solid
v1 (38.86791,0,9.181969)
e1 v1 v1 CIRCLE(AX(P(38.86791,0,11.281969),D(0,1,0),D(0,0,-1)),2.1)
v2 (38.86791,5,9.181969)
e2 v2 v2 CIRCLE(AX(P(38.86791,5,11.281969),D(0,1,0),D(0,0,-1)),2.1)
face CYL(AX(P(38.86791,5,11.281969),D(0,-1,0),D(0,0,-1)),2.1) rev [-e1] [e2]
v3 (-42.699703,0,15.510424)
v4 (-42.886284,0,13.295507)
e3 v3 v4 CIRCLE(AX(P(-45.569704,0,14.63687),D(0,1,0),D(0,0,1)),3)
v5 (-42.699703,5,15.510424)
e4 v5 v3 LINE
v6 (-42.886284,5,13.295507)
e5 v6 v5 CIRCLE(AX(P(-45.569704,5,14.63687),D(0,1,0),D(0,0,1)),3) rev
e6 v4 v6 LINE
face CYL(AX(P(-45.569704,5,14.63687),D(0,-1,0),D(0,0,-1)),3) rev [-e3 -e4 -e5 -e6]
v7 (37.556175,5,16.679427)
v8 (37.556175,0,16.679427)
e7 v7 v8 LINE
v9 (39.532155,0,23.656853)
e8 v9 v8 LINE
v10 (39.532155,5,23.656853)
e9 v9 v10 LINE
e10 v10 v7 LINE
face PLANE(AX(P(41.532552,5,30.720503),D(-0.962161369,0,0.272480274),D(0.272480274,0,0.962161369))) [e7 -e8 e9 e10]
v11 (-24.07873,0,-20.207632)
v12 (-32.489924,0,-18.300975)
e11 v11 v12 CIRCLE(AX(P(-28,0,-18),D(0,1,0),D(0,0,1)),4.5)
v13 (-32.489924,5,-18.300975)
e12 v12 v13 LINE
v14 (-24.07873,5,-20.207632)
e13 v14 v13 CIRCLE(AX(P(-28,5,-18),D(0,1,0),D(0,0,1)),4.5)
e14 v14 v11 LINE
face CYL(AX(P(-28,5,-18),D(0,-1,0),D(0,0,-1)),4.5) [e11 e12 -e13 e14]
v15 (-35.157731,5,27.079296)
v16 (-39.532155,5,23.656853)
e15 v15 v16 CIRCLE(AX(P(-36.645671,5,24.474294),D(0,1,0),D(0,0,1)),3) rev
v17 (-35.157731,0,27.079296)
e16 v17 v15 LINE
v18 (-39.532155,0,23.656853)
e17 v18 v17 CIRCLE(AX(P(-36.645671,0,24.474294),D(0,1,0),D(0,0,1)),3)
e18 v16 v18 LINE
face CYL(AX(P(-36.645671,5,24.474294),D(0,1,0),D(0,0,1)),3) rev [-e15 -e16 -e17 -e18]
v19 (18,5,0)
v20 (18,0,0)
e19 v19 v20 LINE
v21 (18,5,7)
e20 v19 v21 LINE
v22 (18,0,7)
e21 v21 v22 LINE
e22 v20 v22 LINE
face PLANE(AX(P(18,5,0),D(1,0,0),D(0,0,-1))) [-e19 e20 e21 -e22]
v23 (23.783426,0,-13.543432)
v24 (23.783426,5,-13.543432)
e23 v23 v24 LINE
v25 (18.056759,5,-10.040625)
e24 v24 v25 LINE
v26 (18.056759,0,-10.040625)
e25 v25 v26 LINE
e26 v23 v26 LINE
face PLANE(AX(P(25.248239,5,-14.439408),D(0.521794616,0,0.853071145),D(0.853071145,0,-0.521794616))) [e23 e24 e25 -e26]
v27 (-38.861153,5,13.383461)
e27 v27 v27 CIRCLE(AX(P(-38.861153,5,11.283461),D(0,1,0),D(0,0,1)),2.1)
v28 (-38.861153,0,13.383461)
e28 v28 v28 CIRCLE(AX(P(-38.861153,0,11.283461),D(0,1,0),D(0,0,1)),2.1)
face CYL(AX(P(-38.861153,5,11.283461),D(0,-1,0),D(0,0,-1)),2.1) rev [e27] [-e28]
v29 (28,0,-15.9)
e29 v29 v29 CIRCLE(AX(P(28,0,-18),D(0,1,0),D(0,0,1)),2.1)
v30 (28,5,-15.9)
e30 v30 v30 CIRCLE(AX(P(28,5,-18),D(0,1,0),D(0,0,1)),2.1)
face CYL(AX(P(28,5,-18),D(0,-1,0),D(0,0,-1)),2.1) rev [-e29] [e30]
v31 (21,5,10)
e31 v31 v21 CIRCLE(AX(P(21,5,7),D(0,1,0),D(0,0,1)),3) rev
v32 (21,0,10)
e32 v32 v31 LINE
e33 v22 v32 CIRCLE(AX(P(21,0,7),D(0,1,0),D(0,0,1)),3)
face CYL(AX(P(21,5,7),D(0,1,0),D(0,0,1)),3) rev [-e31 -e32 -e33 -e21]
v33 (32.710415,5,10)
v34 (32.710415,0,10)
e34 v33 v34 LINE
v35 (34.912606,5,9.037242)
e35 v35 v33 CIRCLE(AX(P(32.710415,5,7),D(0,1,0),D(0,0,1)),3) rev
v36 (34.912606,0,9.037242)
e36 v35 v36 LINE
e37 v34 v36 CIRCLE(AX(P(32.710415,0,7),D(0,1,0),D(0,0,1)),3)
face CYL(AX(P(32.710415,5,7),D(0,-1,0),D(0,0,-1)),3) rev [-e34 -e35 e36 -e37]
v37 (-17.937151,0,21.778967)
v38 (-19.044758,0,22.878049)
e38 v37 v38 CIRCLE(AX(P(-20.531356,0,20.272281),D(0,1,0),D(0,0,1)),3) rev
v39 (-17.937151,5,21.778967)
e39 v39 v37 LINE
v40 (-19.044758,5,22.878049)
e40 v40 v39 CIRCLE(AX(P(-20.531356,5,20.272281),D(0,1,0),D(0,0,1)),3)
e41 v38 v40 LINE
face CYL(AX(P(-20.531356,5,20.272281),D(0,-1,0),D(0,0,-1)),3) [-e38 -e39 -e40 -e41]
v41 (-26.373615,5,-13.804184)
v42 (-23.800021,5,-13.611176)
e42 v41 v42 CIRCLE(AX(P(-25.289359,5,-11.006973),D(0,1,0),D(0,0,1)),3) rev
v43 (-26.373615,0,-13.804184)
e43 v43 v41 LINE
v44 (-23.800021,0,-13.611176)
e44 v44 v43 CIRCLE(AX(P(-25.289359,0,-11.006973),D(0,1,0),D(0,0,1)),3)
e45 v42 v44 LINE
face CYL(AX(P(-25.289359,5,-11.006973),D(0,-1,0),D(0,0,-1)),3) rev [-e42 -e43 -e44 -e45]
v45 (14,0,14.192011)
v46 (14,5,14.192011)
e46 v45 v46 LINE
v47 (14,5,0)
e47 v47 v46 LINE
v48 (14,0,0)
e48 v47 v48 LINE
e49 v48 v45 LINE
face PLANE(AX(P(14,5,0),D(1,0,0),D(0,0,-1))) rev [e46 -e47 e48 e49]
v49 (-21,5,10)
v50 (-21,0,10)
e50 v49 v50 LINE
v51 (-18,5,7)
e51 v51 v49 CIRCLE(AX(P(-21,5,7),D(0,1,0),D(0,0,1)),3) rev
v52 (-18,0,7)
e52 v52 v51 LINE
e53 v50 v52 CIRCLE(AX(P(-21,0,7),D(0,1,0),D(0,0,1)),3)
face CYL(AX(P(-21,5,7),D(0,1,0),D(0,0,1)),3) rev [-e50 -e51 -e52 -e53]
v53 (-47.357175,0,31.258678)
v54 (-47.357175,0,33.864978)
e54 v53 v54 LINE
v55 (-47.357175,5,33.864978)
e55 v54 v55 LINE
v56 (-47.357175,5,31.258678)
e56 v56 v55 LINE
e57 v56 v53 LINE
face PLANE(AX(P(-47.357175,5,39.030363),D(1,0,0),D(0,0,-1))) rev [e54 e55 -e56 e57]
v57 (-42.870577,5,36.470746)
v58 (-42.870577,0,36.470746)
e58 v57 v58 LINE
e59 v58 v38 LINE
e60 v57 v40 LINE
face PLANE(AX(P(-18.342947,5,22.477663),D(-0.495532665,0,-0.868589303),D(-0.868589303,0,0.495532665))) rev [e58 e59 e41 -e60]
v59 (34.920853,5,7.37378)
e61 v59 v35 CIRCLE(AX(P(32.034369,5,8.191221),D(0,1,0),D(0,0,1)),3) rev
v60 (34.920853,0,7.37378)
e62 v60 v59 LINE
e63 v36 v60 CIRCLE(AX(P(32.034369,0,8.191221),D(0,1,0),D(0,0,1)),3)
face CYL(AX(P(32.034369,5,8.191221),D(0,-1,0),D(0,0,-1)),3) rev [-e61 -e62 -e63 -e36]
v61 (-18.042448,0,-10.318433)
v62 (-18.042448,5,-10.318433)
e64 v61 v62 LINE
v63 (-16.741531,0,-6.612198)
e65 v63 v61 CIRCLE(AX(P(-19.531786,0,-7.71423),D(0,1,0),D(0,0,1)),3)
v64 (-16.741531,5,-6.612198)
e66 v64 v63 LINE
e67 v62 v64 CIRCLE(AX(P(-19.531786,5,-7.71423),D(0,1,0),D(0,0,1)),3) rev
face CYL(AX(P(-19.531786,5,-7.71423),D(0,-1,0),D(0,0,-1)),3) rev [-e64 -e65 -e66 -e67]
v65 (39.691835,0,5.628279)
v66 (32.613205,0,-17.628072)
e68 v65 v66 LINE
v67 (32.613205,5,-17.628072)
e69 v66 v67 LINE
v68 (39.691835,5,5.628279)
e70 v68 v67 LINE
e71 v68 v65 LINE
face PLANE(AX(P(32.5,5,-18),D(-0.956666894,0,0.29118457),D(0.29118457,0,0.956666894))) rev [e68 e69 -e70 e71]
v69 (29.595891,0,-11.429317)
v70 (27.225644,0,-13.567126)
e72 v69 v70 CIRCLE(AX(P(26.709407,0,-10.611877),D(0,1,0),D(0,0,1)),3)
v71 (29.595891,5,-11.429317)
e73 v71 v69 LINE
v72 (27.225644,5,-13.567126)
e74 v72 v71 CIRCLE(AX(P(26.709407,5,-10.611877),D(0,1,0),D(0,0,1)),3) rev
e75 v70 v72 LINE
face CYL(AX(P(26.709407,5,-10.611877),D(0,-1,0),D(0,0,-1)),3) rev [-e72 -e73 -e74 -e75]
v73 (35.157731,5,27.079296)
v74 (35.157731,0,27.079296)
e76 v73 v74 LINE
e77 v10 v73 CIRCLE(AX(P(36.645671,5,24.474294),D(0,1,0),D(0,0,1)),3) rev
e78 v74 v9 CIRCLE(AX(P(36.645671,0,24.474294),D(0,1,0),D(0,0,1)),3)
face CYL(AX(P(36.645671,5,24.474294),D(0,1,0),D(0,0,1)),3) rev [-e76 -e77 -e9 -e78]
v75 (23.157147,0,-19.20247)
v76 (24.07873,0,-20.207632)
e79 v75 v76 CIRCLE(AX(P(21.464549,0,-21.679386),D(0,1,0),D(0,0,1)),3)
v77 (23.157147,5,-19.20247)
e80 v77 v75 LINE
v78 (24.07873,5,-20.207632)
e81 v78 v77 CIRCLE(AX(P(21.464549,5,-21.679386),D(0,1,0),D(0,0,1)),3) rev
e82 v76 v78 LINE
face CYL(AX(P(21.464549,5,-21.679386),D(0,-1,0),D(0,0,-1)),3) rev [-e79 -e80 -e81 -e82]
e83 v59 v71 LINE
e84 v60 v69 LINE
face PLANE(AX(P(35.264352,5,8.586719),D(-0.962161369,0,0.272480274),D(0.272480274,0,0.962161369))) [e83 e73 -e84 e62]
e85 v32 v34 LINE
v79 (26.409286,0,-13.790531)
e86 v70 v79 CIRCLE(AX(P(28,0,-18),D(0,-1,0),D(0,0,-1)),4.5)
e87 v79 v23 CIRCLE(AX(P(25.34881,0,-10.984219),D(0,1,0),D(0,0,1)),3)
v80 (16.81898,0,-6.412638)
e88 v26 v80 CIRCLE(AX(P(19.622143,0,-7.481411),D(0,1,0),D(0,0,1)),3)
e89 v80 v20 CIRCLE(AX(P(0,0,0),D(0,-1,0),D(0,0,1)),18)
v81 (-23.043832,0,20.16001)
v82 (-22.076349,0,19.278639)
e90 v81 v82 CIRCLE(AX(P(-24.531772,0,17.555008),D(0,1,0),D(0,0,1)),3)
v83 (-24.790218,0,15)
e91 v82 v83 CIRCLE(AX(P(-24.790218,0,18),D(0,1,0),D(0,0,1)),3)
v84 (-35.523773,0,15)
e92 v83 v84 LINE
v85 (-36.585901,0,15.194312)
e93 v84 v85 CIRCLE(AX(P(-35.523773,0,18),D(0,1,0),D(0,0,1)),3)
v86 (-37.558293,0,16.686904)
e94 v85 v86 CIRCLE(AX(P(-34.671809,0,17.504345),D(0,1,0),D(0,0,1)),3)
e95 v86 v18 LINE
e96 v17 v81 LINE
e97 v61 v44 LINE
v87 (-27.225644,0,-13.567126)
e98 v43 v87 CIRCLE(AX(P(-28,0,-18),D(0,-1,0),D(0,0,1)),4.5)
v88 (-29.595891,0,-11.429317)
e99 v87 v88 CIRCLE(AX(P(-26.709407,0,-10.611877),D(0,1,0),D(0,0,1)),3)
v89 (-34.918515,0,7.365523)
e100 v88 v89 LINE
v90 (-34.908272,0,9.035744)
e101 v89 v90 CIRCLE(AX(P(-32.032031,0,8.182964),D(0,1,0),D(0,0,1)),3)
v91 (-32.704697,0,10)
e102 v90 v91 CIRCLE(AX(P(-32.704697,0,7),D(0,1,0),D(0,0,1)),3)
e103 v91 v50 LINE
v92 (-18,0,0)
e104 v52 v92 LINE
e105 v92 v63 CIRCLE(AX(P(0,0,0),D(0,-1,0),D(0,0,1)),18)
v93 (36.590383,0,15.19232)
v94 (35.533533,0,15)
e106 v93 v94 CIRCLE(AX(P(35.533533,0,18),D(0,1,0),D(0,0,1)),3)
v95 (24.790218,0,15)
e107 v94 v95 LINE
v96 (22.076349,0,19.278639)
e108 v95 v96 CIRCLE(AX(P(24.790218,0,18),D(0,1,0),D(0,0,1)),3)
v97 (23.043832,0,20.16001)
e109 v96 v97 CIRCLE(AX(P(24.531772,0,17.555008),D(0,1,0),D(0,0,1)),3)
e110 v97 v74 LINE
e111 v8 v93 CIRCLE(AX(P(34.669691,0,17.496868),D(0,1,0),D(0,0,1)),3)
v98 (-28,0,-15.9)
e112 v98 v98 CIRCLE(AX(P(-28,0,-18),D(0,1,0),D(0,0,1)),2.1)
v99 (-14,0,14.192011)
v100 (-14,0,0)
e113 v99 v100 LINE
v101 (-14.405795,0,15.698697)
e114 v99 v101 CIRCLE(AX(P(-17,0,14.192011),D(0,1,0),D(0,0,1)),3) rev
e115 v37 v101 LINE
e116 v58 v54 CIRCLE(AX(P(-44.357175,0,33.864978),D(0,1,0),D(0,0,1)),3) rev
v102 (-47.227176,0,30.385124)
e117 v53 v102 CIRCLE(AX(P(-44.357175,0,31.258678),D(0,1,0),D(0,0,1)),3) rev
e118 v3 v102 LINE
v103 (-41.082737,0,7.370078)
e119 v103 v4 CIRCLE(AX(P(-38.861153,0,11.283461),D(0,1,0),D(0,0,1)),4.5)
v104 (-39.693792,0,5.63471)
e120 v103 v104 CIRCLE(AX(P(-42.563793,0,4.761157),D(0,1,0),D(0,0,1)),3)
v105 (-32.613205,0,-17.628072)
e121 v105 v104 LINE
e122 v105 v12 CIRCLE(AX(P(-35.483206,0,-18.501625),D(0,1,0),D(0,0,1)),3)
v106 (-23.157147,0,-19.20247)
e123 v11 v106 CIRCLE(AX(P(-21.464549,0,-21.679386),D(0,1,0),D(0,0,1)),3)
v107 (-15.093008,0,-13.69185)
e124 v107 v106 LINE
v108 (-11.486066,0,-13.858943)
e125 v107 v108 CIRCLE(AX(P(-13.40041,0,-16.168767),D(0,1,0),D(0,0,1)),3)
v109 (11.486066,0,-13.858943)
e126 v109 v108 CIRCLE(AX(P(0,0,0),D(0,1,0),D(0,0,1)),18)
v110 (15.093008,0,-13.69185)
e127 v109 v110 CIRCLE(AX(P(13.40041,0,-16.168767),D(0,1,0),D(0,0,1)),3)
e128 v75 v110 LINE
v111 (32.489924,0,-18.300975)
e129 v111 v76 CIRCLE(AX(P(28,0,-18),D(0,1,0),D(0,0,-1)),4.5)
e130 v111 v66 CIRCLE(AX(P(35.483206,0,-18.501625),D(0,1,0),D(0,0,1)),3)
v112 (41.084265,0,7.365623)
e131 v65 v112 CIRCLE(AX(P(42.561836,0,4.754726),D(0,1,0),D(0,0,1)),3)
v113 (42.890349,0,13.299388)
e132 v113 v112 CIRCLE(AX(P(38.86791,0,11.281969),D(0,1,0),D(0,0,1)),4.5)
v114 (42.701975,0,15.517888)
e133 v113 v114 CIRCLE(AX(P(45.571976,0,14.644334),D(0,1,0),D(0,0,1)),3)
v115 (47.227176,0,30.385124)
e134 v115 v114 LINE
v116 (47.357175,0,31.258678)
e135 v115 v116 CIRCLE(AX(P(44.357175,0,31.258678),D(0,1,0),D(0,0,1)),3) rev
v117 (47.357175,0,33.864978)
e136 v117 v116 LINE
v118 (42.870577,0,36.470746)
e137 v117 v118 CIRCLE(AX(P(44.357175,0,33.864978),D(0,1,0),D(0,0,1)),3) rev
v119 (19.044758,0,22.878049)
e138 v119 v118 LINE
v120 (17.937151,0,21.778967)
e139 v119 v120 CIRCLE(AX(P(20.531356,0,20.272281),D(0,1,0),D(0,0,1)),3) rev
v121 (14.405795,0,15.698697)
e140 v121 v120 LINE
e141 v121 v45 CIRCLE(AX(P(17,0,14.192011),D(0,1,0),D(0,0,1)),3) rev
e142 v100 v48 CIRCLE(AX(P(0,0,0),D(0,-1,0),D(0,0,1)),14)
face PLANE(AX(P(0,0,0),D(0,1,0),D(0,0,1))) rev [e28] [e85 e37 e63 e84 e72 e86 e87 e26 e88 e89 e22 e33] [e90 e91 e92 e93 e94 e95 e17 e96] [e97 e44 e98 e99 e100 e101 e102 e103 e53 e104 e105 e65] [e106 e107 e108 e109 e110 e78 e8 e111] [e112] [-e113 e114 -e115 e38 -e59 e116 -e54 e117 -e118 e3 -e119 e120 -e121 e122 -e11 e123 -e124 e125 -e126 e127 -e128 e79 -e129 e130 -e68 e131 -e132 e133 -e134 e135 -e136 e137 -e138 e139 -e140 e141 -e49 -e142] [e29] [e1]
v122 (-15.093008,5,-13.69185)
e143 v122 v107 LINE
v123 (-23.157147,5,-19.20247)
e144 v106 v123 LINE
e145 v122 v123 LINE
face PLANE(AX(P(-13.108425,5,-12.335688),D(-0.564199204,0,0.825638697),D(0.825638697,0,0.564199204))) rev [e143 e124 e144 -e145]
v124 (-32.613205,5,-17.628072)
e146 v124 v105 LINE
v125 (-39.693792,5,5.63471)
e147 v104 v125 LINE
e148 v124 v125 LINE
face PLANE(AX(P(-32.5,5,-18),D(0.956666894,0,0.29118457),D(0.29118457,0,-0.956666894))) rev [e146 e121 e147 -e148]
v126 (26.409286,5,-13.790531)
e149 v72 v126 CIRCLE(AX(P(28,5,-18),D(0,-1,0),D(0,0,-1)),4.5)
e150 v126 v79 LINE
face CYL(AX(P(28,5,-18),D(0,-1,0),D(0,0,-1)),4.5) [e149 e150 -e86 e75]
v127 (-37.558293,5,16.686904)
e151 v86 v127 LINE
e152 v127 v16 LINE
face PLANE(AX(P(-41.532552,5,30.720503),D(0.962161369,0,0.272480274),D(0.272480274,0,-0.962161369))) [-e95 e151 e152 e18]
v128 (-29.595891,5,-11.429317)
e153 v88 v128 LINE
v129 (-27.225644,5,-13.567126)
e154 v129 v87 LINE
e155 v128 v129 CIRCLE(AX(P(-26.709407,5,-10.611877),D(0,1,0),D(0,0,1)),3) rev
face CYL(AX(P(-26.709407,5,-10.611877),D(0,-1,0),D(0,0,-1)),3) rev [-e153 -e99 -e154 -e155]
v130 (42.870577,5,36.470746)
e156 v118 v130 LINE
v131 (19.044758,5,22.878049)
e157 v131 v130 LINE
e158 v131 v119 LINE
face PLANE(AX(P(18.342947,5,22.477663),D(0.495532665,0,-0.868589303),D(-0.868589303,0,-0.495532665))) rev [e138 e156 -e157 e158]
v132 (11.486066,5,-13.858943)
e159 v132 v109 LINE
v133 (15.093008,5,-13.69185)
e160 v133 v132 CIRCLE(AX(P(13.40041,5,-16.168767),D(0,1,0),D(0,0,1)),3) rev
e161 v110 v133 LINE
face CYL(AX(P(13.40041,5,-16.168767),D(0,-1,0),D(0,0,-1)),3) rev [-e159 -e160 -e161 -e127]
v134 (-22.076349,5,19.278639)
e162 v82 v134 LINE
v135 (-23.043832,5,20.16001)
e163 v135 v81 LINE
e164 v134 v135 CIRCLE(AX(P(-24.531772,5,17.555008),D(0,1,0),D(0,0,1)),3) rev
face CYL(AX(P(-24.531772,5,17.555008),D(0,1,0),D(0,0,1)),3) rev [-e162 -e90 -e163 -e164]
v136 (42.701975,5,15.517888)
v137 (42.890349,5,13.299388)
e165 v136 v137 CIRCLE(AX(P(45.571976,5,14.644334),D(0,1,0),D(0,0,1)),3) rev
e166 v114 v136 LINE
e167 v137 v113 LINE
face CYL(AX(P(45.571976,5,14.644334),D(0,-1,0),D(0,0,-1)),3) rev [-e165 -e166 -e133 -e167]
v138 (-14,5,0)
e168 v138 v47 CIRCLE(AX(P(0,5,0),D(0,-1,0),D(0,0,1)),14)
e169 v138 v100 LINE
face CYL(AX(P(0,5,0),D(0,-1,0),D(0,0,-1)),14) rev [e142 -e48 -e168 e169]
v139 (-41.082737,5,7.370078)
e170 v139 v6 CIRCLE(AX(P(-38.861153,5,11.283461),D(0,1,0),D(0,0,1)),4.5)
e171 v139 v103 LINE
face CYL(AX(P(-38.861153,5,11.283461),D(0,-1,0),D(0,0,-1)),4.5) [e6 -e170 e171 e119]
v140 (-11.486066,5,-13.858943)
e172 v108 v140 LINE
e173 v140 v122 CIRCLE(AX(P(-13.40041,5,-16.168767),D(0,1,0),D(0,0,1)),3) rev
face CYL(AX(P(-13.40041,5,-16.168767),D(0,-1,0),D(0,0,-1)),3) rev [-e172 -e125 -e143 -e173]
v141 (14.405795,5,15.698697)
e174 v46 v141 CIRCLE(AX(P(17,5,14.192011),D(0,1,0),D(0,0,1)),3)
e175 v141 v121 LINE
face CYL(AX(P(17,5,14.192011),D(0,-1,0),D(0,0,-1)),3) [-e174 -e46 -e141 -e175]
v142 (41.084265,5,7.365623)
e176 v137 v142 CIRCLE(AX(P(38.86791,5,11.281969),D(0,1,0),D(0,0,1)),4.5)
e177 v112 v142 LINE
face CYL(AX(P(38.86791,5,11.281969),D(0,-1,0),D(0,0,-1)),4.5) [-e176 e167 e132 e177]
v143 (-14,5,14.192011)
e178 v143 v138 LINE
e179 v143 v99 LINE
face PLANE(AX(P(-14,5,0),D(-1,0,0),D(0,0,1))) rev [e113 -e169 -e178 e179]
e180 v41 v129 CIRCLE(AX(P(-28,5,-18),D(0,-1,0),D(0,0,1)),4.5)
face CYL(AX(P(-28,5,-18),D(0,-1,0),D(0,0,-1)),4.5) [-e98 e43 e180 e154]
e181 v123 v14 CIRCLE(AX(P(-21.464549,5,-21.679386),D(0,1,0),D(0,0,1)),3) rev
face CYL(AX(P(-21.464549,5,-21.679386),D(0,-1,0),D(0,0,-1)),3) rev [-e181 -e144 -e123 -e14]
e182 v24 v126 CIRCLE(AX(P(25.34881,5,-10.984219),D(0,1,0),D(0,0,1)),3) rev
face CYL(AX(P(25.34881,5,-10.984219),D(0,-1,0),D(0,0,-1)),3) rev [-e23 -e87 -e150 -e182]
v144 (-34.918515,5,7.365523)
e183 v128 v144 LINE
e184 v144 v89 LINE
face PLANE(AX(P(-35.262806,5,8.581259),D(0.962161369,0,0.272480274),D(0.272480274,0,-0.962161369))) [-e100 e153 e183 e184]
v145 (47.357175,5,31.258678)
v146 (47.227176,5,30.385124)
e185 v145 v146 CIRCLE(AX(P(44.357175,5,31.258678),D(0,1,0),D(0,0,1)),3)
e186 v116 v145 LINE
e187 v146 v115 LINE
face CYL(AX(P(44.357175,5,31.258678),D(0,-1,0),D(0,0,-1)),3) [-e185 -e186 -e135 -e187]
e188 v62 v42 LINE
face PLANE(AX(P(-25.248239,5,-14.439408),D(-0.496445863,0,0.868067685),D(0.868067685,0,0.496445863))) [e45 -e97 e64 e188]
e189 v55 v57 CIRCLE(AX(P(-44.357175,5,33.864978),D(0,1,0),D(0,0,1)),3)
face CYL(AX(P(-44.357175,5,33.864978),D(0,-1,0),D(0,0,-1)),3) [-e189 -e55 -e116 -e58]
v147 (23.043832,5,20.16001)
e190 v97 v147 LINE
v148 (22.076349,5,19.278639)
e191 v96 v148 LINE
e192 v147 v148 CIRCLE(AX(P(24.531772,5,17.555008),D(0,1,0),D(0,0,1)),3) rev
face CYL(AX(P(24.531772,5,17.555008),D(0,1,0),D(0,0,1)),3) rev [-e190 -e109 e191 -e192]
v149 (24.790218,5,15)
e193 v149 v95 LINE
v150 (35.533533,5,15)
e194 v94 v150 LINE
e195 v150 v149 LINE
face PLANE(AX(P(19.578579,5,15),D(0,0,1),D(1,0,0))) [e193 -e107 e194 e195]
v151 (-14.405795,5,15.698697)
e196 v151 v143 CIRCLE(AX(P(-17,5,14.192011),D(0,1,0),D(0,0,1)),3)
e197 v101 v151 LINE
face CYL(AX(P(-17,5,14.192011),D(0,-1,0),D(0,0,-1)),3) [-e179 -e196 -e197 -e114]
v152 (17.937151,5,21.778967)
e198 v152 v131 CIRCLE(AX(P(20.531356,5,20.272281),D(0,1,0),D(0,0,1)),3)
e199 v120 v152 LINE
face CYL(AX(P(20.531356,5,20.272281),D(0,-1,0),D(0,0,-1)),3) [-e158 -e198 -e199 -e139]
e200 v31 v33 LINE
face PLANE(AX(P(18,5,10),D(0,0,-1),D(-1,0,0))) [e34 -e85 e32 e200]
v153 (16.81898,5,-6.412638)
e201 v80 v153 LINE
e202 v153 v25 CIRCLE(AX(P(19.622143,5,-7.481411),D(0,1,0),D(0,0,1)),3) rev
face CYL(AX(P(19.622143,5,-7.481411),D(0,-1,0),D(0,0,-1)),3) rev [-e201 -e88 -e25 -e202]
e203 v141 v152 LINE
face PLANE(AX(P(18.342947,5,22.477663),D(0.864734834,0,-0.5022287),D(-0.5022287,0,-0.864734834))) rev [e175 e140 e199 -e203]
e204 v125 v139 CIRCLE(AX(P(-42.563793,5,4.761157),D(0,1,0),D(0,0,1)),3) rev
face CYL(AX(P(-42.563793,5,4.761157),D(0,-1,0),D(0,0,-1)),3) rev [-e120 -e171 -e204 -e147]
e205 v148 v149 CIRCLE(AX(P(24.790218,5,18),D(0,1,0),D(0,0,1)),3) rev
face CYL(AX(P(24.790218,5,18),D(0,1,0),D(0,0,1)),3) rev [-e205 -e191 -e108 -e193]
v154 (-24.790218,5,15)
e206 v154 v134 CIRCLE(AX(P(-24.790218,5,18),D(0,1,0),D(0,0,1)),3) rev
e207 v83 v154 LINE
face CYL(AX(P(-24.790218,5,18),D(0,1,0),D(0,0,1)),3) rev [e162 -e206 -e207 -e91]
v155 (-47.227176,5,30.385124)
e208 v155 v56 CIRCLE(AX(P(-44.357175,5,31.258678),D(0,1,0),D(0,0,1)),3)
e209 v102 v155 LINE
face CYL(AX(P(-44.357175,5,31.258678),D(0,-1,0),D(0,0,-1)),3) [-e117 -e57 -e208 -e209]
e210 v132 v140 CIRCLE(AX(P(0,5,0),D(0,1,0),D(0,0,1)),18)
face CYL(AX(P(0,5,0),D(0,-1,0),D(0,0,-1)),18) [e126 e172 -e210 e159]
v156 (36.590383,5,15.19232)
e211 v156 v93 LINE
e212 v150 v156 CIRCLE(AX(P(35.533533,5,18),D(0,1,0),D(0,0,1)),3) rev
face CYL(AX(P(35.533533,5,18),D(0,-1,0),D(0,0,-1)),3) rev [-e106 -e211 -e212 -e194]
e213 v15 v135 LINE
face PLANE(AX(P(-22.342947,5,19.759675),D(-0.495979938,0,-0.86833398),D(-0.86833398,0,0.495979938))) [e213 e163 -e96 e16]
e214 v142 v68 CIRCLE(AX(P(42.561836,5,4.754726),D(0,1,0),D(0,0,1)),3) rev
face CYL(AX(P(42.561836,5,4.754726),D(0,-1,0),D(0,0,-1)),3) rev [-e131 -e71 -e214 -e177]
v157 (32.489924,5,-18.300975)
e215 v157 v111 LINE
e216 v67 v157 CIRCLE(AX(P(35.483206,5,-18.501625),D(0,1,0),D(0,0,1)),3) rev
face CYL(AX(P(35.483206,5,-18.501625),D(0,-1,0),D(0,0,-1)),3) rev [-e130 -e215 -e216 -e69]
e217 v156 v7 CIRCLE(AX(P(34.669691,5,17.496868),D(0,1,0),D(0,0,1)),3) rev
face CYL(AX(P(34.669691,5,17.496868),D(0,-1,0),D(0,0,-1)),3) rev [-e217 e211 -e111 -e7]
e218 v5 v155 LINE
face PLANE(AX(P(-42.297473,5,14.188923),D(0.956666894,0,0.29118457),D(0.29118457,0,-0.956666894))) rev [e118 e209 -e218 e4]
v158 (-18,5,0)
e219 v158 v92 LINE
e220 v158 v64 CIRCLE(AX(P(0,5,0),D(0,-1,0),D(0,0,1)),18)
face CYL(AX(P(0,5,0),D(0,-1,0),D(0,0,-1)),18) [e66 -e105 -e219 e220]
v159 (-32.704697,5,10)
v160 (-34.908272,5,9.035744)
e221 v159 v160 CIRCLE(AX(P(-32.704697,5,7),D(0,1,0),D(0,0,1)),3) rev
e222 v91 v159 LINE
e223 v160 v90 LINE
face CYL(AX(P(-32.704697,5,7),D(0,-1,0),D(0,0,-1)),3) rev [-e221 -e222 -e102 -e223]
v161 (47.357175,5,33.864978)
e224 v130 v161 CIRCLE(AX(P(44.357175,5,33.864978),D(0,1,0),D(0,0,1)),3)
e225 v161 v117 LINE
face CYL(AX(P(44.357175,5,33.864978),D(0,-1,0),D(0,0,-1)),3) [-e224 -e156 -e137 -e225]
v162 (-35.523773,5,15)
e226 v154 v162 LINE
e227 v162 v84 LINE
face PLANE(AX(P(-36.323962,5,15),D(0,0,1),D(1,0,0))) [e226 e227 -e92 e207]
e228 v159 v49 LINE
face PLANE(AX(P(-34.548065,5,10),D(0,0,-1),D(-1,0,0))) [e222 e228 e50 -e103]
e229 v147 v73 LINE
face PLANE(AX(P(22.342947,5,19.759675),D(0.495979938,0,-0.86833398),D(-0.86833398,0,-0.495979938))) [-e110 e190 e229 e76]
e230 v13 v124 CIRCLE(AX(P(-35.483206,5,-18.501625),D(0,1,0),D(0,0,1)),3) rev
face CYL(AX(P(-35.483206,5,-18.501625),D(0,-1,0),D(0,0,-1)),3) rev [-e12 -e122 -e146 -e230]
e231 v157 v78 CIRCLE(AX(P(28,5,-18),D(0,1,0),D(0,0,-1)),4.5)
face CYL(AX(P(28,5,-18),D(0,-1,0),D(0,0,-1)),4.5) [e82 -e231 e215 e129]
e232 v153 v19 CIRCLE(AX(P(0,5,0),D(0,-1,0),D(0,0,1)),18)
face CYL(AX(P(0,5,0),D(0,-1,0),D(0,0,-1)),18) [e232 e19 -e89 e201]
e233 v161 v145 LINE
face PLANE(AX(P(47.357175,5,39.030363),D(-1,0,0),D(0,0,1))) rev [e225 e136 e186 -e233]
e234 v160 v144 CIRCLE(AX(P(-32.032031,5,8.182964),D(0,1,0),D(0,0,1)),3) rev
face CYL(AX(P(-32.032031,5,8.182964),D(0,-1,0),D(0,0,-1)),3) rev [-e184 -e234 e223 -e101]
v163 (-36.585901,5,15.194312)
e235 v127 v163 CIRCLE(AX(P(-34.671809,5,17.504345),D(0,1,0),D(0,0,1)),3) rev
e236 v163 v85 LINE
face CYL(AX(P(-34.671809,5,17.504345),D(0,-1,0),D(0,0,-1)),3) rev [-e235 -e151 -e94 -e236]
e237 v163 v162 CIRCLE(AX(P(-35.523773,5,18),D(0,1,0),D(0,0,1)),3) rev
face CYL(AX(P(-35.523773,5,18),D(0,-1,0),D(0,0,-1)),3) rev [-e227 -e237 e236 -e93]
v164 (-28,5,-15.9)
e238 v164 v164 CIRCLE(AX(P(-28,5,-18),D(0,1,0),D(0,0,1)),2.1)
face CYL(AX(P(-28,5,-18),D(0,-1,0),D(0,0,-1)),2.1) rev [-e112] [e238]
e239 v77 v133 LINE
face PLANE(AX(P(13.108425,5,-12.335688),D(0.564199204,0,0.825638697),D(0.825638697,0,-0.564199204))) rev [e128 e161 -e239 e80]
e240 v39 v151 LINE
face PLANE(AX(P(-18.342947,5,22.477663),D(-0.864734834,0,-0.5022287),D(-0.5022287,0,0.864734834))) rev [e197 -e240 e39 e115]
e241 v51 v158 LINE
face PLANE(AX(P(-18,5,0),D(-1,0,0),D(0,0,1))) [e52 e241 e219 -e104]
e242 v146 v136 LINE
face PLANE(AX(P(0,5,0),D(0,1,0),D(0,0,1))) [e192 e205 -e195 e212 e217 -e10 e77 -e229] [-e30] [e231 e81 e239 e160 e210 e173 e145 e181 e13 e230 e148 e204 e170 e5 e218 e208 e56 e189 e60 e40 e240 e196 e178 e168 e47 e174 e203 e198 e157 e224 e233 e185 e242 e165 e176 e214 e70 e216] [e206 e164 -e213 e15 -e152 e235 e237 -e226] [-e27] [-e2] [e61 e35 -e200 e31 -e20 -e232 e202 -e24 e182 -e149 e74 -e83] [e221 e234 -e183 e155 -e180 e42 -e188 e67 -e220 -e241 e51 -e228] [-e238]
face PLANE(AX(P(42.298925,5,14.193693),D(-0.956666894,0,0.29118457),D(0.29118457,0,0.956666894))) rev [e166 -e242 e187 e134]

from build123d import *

# Parameters (mm, degrees)
SKETCH1_R           = 2.1
BOSS_EXTRUDE1_DEPTH = 5
FILLET1_R           = 3


with BuildPart() as part:
    # Sketch1 → Boss-Extrude1 (new body)
    with BuildSketch(Plane(origin=(0, 0, 0), x_dir=(1, 0, 0), z_dir=(0, 1, 0))):
        with BuildLine():
            Line((-13.108424678, 12.335688164), (-23.81391613, 19.651272793))
            ThreePointArc((-23.81391613, 19.651272793), (-28.840423282, 22.420824437), (-32.5, 18))
            Line((-32.5, 18), (-40.096022742, -6.956210733))
            ThreePointArc((-40.096022742, -6.956210733), (-43.166154305, -9.97313073), (-42.297472679, -14.188923219))
            Line((-42.297472679, -14.188923219), (-47.357175059, -30.812227694))
            Line((-47.357175059, -30.812227694), (-47.357175059, -39.030363151))
            Line((-47.357175059, -39.030363151), (-18.342946516, -22.477663327))
            Line((-18.342946516, -22.477663327), (-14, -15))
            Line((-14, -15), (-14, 0))
            ThreePointArc((-14, 0), (0, 14), (14, 0))
            Line((14, 0), (14, -15))
            Line((14, -15), (18.342946516, -22.477663327))
            Line((18.342946516, -22.477663327), (47.357175059, -39.030363151))
            Line((47.357175059, -39.030363151), (47.357175059, -30.812227694))
            Line((47.357175059, -30.812227694), (42.298924547, -14.193693231))
            ThreePointArc((42.298924547, -14.193693231), (43.172910541, -9.971638801), (40.094885373, -6.952473984))
            Line((40.094885373, -6.952473984), (32.5, 18))
            ThreePointArc((32.5, 18), (28.840423282, 22.420824437), (23.81391613, 19.651272793))
            Line((23.81391613, 19.651272793), (13.108424678, 12.335688164))
            ThreePointArc((13.108424678, 12.335688164), (0, 18), (-13.108424678, 12.335688164))
        make_face()
        with Locations(Location((-28, 18, 0), (0, 0, 270))):
            Circle(SKETCH1_R, mode=Mode.SUBTRACT)
        with Locations(Location((28, 18, 0), (0, 0, 270))):
            Circle(SKETCH1_R, mode=Mode.SUBTRACT)
        with Locations(Location((-38.861153282, -11.283461294, 0), (0, 0, 270))):
            Circle(SKETCH1_R, mode=Mode.SUBTRACT)
        with Locations(Location((38.867909518, -11.281969365, 0), (0, 0, 90))):
            Circle(SKETCH1_R, mode=Mode.SUBTRACT)
        with BuildLine():
            Line((-25.248239149, 14.439408445), (-15.625218329, 8.936025525))
            ThreePointArc((-15.625218329, 8.936025525), (-17.396176734, 4.623097992), (-18, 0))
            Line((-18, 0), (-18, -10))
            Line((-18, -10), (-34.548065396, -10))
            ThreePointArc((-34.548065396, -10), (-34.842334147, -9.258839659), (-35.262806272, -8.581258711))
            Line((-35.262806272, -8.581258711), (-28.978960053, 13.607775368))
            ThreePointArc((-28.978960053, 13.607775368), (-27.02091417, 13.607803404), (-25.248239149, 14.439408445))
        make_face(mode=Mode.SUBTRACT)
        with BuildLine():
            Line((25.248239149, 14.439408445), (15.784829627, 8.650962585))
            ThreePointArc((15.784829627, 8.650962585), (17.43741571, 4.46503453), (18, 0))
            Line((18, 0), (18, -10))
            Line((18, -10), (34.554377954, -10))
            ThreePointArc((34.554377954, -10), (34.846788526, -9.261923334), (35.264352488, -8.586718591))
            Line((35.264352488, -8.586718591), (28.978960053, 13.607775368))
            ThreePointArc((28.978960053, 13.607775368), (27.02091417, 13.607803404), (25.248239149, 14.439408445))
        make_face(mode=Mode.SUBTRACT)
        with BuildLine():
            Line((-41.532552131, -30.720502684), (-37.214001281, -15.471168338))
            ThreePointArc((-37.214001281, -15.471168338), (-36.75575967, -15.260560455), (-36.323961913, -15))
            Line((-36.323961913, -15), (-19.578578595, -15))
            Line((-19.578578595, -15), (-22.342946516, -19.759674693))
            Line((-22.342946516, -19.759674693), (-41.532552131, -30.720502684))
        make_face(mode=Mode.SUBTRACT)
        with BuildLine():
            Line((22.342946516, -19.759674693), (19.578578595, -15))
            Line((19.578578595, -15), (36.332904943, -15))
            ThreePointArc((36.332904943, -15), (36.759847211, -15.257654628), (37.212676027, -15.466488703))
            Line((37.212676027, -15.466488703), (41.532552131, -30.720502684))
            Line((41.532552131, -30.720502684), (22.342946516, -19.759674693))
        make_face(mode=Mode.SUBTRACT)
    extrude(amount=BOSS_EXTRUDE1_DEPTH)

    # Fillet1
    # the kernel refuses this fillet: 3 mm, written as the material it adds along each edge
    with BuildSketch(Plane(origin=(-23.81391613, 0, -19.651272793), x_dir=(0.8256386968680198, 0, 0.5641992043897953), z_dir=(0, 1, 0))) as fillet1_piece_1:
        with BuildLine():
            CenterArc((0.795468008, 3), FILLET1_R, 243.725731212, 26.274268788)
            ThreePointArc((-0.532537609, 0.309944038), (-0.26095765, 0.164097503), (0, 0))
            Line((0, 0), (0.795468008, 0))
        make_face()
    extrude(amount=5)
    with BuildSketch(Plane(origin=(23.81391613, 0, -19.651272793), x_dir=(0.42977558669909965, 0, -0.9029357369588629), z_dir=(0, 1, 0))) as fillet1_piece_2:
        with BuildLine():
            CenterArc((0.821555826, 2.992960971), FILLET1_R, 239.800020252, 26.274268788)
            Line((-0.687503097, 0.400136032), (0, 0))
            ThreePointArc((0, 0), (0.308083435, 0.010558543), (0.61616687, 0))
        make_face()
    extrude(amount=5)
    with BuildSketch(Plane(origin=(-25.248239149, 0, -14.439408445), x_dir=(0.8680676849209873, 0, 0.496445862502567), z_dir=(0, 1, 0))) as fillet1_piece_3:
        with BuildLine():
            CenterArc((1.668323511, -3), FILLET1_R, 90, 50.952492326)
            ThreePointArc((-0.66154814, -1.110106329), (-0.290717482, -0.578924176), (0, 0))
            Line((0, 0), (1.668323511, 0))
        make_face()
    extrude(amount=5)
    with BuildSketch(Plane(origin=(25.248239149, 0, -14.439408445), x_dir=(0.872925185444734, 0, 0.4878540976729382), z_dir=(0, 1, 0))) as fillet1_piece_4:
        with BuildLine():
            CenterArc((1.773419123, -2.967058567), FILLET1_R, 98.498581583, 52.153761346)
            Line((-0.841566624, -1.496735629), (0, 0))
            ThreePointArc((0, 0), (0.665032171, -0.04941215), (1.330064343, 0))
        make_face()
    extrude(amount=5)
    with BuildSketch(Plane(origin=(15.784829627, 0, -8.650962585), x_dir=(0.41941825768343016, 0, 0.9077931070027994), z_dir=(0, 1, 0))) as fillet1_piece_5:
        with BuildLine():
            CenterArc((2.671150004, 2.992955198), FILLET1_R, 186.654842848, 79.417835827)
            Line((-0.308636879, 2.64529137), (0, 0))
            ThreePointArc((0, 0), (1.232838463, 0.042268815), (2.465676926, 0))
        make_face()
    extrude(amount=5)
    with BuildSketch(Plane(origin=(-15.625218329, 0, -8.936025525), x_dir=(-0.8680676849209876, 0, -0.4964458625025664), z_dir=(0, 1, 0))) as fillet1_piece_6:
        with BuildLine():
            CenterArc((2.784609691, 3), FILLET1_R, 188.213210702, 81.786789298)
            ThreePointArc((-0.184620265, 2.571428571), (-0.046214393, 1.289023811), (0, 0))
            Line((0, 0), (2.784609691, 0))
        make_face()
    extrude(amount=5)
    with BuildSketch(Plane(origin=(-22.342946516, 0, 19.759674693), x_dir=(0.5022287001852431, 0, -0.8647348337555515), z_dir=(0, 1, 0))) as fillet1_piece_7:
        with BuildLine():
            CenterArc((FILLET1_R * 0.269053653144, FILLET1_R), FILLET1_R, 239.881948801, 30.118051199)
            Line((-FILLET1_R * 0.232729627554, FILLET1_R * 0.135006624758), (0, 0))
            Line((0, 0), (FILLET1_R * 0.269053653144, 0))
        make_face()
    extrude(amount=5)
    with BuildSketch(Plane(origin=(-32.5, 0, -18), x_dir=(0.033460432753213476, 0, -0.9994400429440315), z_dir=(0, 1, 0))) as fillet1_piece_8:
        with BuildLine():
            CenterArc((0.401525193, 2.998320129), FILLET1_R, 254.988611701, 13.093888803)
            Line((-0.375507899, 0.100697038), (0, 0))
            ThreePointArc((0, 0), (0.150571947, 0.002519807), (0.301143895, 0))
        make_face()
    extrude(amount=5)
    with BuildSketch(Plane(origin=(-13.108424678, 0, -12.335688164), x_dir=(-0.8256386968680209, 0, -0.5641992043897939), z_dir=(0, 1, 0))) as fillet1_piece_9:
        with BuildLine():
            CenterArc((2.403694147, -3), FILLET1_R, 90, 73.99808624)
            ThreePointArc((-0.480063319, -2.172991611), (-0.206417918, -1.093921846), (0, 0))
            Line((0, 0), (2.403694147, 0))
        make_face()
    extrude(amount=5)
    with BuildSketch(Plane(origin=(13.108424678, 0, -12.335688164), x_dir=(0.8256386968680193, 0, -0.564199204389796), z_dir=(0, 1, 0))) as fillet1_piece_10:
        with BuildLine():
            CenterArc((2.403694147, 3), FILLET1_R, 196.00191376, 73.99808624)
            ThreePointArc((-0.480063319, 2.172991611), (-0.206417918, 1.093921846), (0, 0))
            Line((0, 0), (2.403694147, 0))
        make_face()
    extrude(amount=5)
    with BuildSketch(Plane(origin=(32.5, 0, -18), x_dir=(0.29118456974575907, 0, 0.9566668941392178), z_dir=(0, 1, 0))) as fillet1_piece_11:
        with BuildLine():
            CenterArc((0.388775096, 3), FILLET1_R, 256.906111197, 13.093888803)
            ThreePointArc((-0.290867168, 0.077999591), (-0.144780926, 0.041433612), (0, 0))
            Line((0, 0), (0.388775096, 0))
        make_face()
    extrude(amount=5)
    with BuildSketch(Plane(origin=(-28.978960053, 0, -13.607775368), x_dir=(-0.27248027384086115, 0, 0.9621613691931357), z_dir=(0, 1, 0))) as fillet1_piece_12:
        with BuildLine():
            CenterArc((2.264129599, 3), FILLET1_R, 205.720636607, 64.279363393)
            ThreePointArc((-0.438632708, 1.69804919), (-0.13579309, 0.870599963), (0, 0))
            Line((0, 0), (2.264129599, 0))
        make_face()
    extrude(amount=5)
    with BuildSketch(Plane(origin=(-18, 0, 10), x_dir=(0, 0, -1), z_dir=(0, 1, 0)), Plane(origin=(18, 0, 10), x_dir=(1, 0, 0), z_dir=(0, 1, 0))) as fillet1_piece_13:
        with BuildLine():
            CenterArc((FILLET1_R, FILLET1_R), FILLET1_R, 180, 90)
            Line((0, FILLET1_R), (0, 0))
            Line((0, 0), (FILLET1_R, 0))
        make_face()
    extrude(amount=5)
    with BuildSketch(Plane(origin=(19.578578595, 0, 15), x_dir=(0.5022287001852463, 0, 0.8647348337555496), z_dir=(0, 1, 0)), Plane(origin=(-19.578578595, 0, 15), x_dir=(-1, 0, 0), z_dir=(0, 1, 0))) as fillet1_piece_14:
        with BuildLine():
            CenterArc((FILLET1_R * 1.73721312192, FILLET1_R), FILLET1_R, 149.852440516, 120.147559484)
            Line((FILLET1_R * 0.872478288169, FILLET1_R * 1.50222870019), (0, 0))
            Line((0, 0), (FILLET1_R * 1.73721312192, 0))
        make_face()
    extrude(amount=5)
    with BuildSketch(Plane(origin=(28.978960053, 0, -13.607775368), x_dir=(-0.9997313516905528, 0, 0.02317810274764039), z_dir=(0, 1, 0))) as fillet1_piece_15:
        with BuildLine():
            CenterArc((2.338382994, 2.94249007), FILLET1_R, 194.483784652, 64.279363393)
            Line((-0.566272391, 2.192172078), (0, 0))
            ThreePointArc((0, 0), (0.876893623, 0.086264895), (1.753787246, 0))
        make_face()
    extrude(amount=5)
    with BuildSketch(Plane(origin=(-42.297472679, 0, 14.188923219), x_dir=(-0.550292568661387, 0, -0.8349719090341021), z_dir=(0, 1, 0))) as fillet1_piece_16:
        with BuildLine():
            CenterArc((1.426661501, 2.978722849), FILLET1_R, 219.684025488, 43.488017804)
            Line((-0.882071355, 1.063063015), (0, 0))
            ThreePointArc((0, 0), (0.534998063, 0.031915727), (1.069996126, 0))
        make_face()
    extrude(amount=5)
    with BuildSketch(Plane(origin=(-40.096022742, 0, 6.956210733), x_dir=(0.29118456974575413, 0, -0.9566668941392192), z_dir=(0, 1, 0))) as fillet1_piece_17:
        with BuildLine():
            CenterArc((1.381359058, 3), FILLET1_R, 226.511982196, 43.488017804)
            ThreePointArc((-0.683249534, 0.82344507), (-0.317063138, 0.432102427), (0, 0))
            Line((0, 0), (1.381359058, 0))
        make_face()
    extrude(amount=5)
    with BuildSketch(Plane(origin=(40.094885373, 0, 6.952473984), x_dir=(0.922776111721525, 0, 0.3853365381534742), z_dir=(0, 1, 0))) as fillet1_piece_18:
        with BuildLine():
            CenterArc((1.429570008, 2.978635694), FILLET1_R, 219.593522345, 43.564534449)
            Line((-0.8821859, 1.066625072), (0, 0))
            ThreePointArc((0, 0), (0.536088753, 0.032046458), (1.072177506, 0))
        make_face()
    extrude(amount=5)
    with BuildSketch(Plane(origin=(42.298924547, 0, 14.193693231), x_dir=(0.29118456974575607, 0, 0.9566668941392186), z_dir=(0, 1, 0))) as fillet1_piece_19:
        with BuildLine():
            CenterArc((1.384175208, 3), FILLET1_R, 226.435465551, 43.564534449)
            ThreePointArc((-0.68333826, 0.826204228), (-0.3169746, 0.433526504), (0, 0))
            Line((0, 0), (1.384175208, 0))
        make_face()
    extrude(amount=5)
    with BuildSketch(Plane(origin=(37.212676027, 0, 15.466488703), x_dir=(-0.884494678117859, 0, -0.4665502806570641), z_dir=(0, 1, 0))) as fillet1_piece_20:
        with BuildLine():
            CenterArc((1.301982556, 2.982289823), FILLET1_R, 223.622510824, 40.148718597)
            Line((-0.869720031, 0.912577796), (0, 0))
            ThreePointArc((0, 0), (0.488243459, 0.026565265), (0.976486917, 0))
        make_face()
    extrude(amount=5)
    with BuildSketch(Plane(origin=(36.332904943, 0, 15), x_dir=(-1, 0, 0), z_dir=(0, 1, 0))) as fillet1_piece_21:
        with BuildLine():
            CenterArc((0.799371586, 3), FILLET1_R, 243.603306461, 26.396693539)
            ThreePointArc((-0.534378878, 0.312787746), (-0.261803191, 0.165595952), (0, 0))
            Line((0, 0), (0.799371586, 0))
        make_face()
    extrude(amount=5)
    with BuildSketch(Plane(origin=(22.342946516, 0, 19.759674693), x_dir=(-0.5022287001852482, 0, -0.8647348337555484), z_dir=(0, 1, 0))) as fillet1_piece_22:
        with BuildLine():
            CenterArc((FILLET1_R * 0.269053653144, -FILLET1_R), FILLET1_R, 90, 30.118051199)
            Line((-FILLET1_R * 0.232729627554, -FILLET1_R * 0.135006624758), (0, 0))
            Line((0, 0), (FILLET1_R * 0.269053653144, 0))
        make_face()
    extrude(amount=5)
    with BuildSketch(Plane(origin=(41.532552131, 0, 30.720502684), x_dir=(-0.27248027384086354, 0, -0.9621613691931349), z_dir=(0, 1, 0))) as fillet1_piece_23:
        with BuildLine():
            CenterArc((FILLET1_R * 2.44714649084, FILLET1_R), FILLET1_R, 134.453699631, 135.546300369)
            Line((FILLET1_R * 1.74681382865, FILLET1_R * 1.7138166167), (0, 0))
            Line((0, 0), (FILLET1_R * 2.44714649084, 0))
        make_face()
    extrude(amount=5)
    with BuildSketch(Plane(origin=(34.554377954, 0, 10), x_dir=(0.4333984006716721, 0, -0.90120243358262), z_dir=(0, 1, 0))) as fillet1_piece_24:
        with BuildLine():
            CenterArc((1.904436719, 2.961979076), FILLET1_R, 205.683425336, 55.184949463)
            Line((-0.799170582, 1.661783874), (0, 0))
            ThreePointArc((0, 0), (0.714163769, 0.057031385), (1.428327539, 0))
        make_face()
    extrude(amount=5)
    with BuildSketch(Plane(origin=(35.264352488, 0, 8.586718591), x_dir=(-0.27248027384086226, 0, -0.9621613691931352), z_dir=(0, 1, 0))) as fillet1_piece_25:
        with BuildLine():
            CenterArc((1.260639189, 3), FILLET1_R, 229.851281403, 40.148718597)
            ThreePointArc((-0.673682239, 0.706879721), (-0.317610501, 0.371767344), (0, 0))
            Line((0, 0), (1.260639189, 0))
        make_face()
    extrude(amount=5)
    with BuildSketch(Plane(origin=(-35.262806272, 0, 8.581258711), x_dir=(0.509969050101938, 0, 0.8601927504566212), z_dir=(0, 1, 0))) as fillet1_piece_26:
        with BuildLine():
            CenterArc((1.304985241, 2.982207797), FILLET1_R, 223.526320741, 40.230486582)
            Line((-0.870188986, 0.916144613), (0, 0))
            ThreePointArc((0, 0), (0.489369465, 0.026688304), (0.978738931, 0))
        make_face()
    extrude(amount=5)
    with BuildSketch(Plane(origin=(-34.548065396, 0, 10), x_dir=(1, 0, 0), z_dir=(0, 1, 0))) as fillet1_piece_27:
        with BuildLine():
            CenterArc((1.843368835, 3), FILLET1_R, 214.828934175, 55.171065825)
            ThreePointArc((-0.619213853, 1.286615483), (-0.258250696, 0.668024131), (0, 0))
            Line((0, 0), (1.843368835, 0))
        make_face()
    extrude(amount=5)
    with BuildSketch(Plane(origin=(-36.323961913, 0, 15), x_dir=(-0.8627664666519094, 0, 0.5056026345075543), z_dir=(0, 1, 0))) as fillet1_piece_28:
        with BuildLine():
            CenterArc((0.826431657, 2.992877072), FILLET1_R, 239.628635242, 26.422318342)
            Line((-0.690376246, 0.404577672), (0, 0))
            ThreePointArc((0, 0), (0.309911872, 0.010684392), (0.619823743, 0))
        make_face()
    extrude(amount=5)
    with BuildSketch(Plane(origin=(-41.532552131, 0, 30.720502684), x_dir=(0.272480273840862, 0, -0.9621613691931352), z_dir=(0, 1, 0))) as fillet1_piece_29:
        with BuildLine():
            CenterArc((FILLET1_R * 2.44714649084, -FILLET1_R), FILLET1_R, 90, 135.546300369)
            Line((FILLET1_R * 1.74681382865, -FILLET1_R * 1.7138166167), (0, 0))
            Line((0, 0), (FILLET1_R * 2.44714649084, 0))
        make_face()
    extrude(amount=5)
    with BuildSketch(Plane(origin=(-37.214001281, 0, 15.471168338), x_dir=(-0.2724802738408629, 0, 0.9621613691931351), z_dir=(0, 1, 0))) as fillet1_piece_30:
        with BuildLine():
            CenterArc((1.263546526, 3), FILLET1_R, 229.769513418, 40.230486582)
            ThreePointArc((-0.67404549, 0.709642566), (-0.317672175, 0.37320119), (0, 0))
            Line((0, 0), (1.263546526, 0))
        make_face()
    extrude(amount=5)
    # the kernel refuses this fillet: 3 mm, written as the material it takes off along each edge
    with BuildSketch(Plane(origin=(47.357175059, -12.913462036, 39.030363151), x_dir=(-0.8685893031239024, 0, -0.4955326654204883), z_dir=(0, 1, 0)), Plane(origin=(-47.357175059, -12.913462036, 39.030363151), x_dir=(0, 0, -1), z_dir=(0, 1, 0))) as fillet1_2_piece_1:
        with BuildLine():
            CenterArc((FILLET1_R * 1.72179493812, -FILLET1_R), FILLET1_R, 90, 119.704881032)
            Line((FILLET1_R * 0.853205634992, -FILLET1_R * 1.49553266542), (0, 0))
            Line((0, 0), (FILLET1_R * 1.72179493812, 0))
        make_face()
    extrude(amount=30.826924072, mode=Mode.SUBTRACT)
    with BuildSketch(Plane(origin=(18.342946516, -2.019973662, 22.477663327), x_dir=(-0.5022287001852438, 0, -0.8647348337555512), z_dir=(0, 1, 0)), Plane(origin=(14, -2.019973662, 15), x_dir=(0, 0, -1), z_dir=(0, 1, 0)), Plane(origin=(-18.342946516, -2.019973662, 22.477663327), x_dir=(-0.8685893031239008, 0, 0.49553266542049107), z_dir=(0, 1, 0)), Plane(origin=(-14, -2.019973662, 15), x_dir=(-0.5022287001852443, 0, 0.8647348337555507), z_dir=(0, 1, 0))) as fillet1_2_piece_2:
        with BuildLine():
            CenterArc((FILLET1_R * 0.269329821642, -FILLET1_R), FILLET1_R, 90, 30.147559484)
            Line((-FILLET1_R * 0.232898878543, -FILLET1_R * 0.135265166244), (0, 0))
            Line((0, 0), (FILLET1_R * 0.269329821642, 0))
        make_face()
    extrude(amount=9.039947325, mode=Mode.SUBTRACT)
    with BuildSketch(Plane(origin=(47.357175059, -1.116124712, 30.812227694), x_dir=(0, 0, 1), z_dir=(0, 1, 0)), Plane(origin=(-47.357175059, -1.116124712, 30.812227694), x_dir=(0.29118456974575035, 0, -0.9566668941392203), z_dir=(0, 1, 0))) as fillet1_2_piece_3:
        with BuildLine():
            CenterArc((FILLET1_R * 0.148816628225, -FILLET1_R), FILLET1_R, 90, 16.928887796)
            Line((-FILLET1_R * 0.142367941521, -FILLET1_R * 0.0433331058608), (0, 0))
            Line((0, 0), (FILLET1_R * 0.148816628225, 0))
        make_face()
    extrude(amount=7.232249423, mode=Mode.SUBTRACT)


solid = part.part
